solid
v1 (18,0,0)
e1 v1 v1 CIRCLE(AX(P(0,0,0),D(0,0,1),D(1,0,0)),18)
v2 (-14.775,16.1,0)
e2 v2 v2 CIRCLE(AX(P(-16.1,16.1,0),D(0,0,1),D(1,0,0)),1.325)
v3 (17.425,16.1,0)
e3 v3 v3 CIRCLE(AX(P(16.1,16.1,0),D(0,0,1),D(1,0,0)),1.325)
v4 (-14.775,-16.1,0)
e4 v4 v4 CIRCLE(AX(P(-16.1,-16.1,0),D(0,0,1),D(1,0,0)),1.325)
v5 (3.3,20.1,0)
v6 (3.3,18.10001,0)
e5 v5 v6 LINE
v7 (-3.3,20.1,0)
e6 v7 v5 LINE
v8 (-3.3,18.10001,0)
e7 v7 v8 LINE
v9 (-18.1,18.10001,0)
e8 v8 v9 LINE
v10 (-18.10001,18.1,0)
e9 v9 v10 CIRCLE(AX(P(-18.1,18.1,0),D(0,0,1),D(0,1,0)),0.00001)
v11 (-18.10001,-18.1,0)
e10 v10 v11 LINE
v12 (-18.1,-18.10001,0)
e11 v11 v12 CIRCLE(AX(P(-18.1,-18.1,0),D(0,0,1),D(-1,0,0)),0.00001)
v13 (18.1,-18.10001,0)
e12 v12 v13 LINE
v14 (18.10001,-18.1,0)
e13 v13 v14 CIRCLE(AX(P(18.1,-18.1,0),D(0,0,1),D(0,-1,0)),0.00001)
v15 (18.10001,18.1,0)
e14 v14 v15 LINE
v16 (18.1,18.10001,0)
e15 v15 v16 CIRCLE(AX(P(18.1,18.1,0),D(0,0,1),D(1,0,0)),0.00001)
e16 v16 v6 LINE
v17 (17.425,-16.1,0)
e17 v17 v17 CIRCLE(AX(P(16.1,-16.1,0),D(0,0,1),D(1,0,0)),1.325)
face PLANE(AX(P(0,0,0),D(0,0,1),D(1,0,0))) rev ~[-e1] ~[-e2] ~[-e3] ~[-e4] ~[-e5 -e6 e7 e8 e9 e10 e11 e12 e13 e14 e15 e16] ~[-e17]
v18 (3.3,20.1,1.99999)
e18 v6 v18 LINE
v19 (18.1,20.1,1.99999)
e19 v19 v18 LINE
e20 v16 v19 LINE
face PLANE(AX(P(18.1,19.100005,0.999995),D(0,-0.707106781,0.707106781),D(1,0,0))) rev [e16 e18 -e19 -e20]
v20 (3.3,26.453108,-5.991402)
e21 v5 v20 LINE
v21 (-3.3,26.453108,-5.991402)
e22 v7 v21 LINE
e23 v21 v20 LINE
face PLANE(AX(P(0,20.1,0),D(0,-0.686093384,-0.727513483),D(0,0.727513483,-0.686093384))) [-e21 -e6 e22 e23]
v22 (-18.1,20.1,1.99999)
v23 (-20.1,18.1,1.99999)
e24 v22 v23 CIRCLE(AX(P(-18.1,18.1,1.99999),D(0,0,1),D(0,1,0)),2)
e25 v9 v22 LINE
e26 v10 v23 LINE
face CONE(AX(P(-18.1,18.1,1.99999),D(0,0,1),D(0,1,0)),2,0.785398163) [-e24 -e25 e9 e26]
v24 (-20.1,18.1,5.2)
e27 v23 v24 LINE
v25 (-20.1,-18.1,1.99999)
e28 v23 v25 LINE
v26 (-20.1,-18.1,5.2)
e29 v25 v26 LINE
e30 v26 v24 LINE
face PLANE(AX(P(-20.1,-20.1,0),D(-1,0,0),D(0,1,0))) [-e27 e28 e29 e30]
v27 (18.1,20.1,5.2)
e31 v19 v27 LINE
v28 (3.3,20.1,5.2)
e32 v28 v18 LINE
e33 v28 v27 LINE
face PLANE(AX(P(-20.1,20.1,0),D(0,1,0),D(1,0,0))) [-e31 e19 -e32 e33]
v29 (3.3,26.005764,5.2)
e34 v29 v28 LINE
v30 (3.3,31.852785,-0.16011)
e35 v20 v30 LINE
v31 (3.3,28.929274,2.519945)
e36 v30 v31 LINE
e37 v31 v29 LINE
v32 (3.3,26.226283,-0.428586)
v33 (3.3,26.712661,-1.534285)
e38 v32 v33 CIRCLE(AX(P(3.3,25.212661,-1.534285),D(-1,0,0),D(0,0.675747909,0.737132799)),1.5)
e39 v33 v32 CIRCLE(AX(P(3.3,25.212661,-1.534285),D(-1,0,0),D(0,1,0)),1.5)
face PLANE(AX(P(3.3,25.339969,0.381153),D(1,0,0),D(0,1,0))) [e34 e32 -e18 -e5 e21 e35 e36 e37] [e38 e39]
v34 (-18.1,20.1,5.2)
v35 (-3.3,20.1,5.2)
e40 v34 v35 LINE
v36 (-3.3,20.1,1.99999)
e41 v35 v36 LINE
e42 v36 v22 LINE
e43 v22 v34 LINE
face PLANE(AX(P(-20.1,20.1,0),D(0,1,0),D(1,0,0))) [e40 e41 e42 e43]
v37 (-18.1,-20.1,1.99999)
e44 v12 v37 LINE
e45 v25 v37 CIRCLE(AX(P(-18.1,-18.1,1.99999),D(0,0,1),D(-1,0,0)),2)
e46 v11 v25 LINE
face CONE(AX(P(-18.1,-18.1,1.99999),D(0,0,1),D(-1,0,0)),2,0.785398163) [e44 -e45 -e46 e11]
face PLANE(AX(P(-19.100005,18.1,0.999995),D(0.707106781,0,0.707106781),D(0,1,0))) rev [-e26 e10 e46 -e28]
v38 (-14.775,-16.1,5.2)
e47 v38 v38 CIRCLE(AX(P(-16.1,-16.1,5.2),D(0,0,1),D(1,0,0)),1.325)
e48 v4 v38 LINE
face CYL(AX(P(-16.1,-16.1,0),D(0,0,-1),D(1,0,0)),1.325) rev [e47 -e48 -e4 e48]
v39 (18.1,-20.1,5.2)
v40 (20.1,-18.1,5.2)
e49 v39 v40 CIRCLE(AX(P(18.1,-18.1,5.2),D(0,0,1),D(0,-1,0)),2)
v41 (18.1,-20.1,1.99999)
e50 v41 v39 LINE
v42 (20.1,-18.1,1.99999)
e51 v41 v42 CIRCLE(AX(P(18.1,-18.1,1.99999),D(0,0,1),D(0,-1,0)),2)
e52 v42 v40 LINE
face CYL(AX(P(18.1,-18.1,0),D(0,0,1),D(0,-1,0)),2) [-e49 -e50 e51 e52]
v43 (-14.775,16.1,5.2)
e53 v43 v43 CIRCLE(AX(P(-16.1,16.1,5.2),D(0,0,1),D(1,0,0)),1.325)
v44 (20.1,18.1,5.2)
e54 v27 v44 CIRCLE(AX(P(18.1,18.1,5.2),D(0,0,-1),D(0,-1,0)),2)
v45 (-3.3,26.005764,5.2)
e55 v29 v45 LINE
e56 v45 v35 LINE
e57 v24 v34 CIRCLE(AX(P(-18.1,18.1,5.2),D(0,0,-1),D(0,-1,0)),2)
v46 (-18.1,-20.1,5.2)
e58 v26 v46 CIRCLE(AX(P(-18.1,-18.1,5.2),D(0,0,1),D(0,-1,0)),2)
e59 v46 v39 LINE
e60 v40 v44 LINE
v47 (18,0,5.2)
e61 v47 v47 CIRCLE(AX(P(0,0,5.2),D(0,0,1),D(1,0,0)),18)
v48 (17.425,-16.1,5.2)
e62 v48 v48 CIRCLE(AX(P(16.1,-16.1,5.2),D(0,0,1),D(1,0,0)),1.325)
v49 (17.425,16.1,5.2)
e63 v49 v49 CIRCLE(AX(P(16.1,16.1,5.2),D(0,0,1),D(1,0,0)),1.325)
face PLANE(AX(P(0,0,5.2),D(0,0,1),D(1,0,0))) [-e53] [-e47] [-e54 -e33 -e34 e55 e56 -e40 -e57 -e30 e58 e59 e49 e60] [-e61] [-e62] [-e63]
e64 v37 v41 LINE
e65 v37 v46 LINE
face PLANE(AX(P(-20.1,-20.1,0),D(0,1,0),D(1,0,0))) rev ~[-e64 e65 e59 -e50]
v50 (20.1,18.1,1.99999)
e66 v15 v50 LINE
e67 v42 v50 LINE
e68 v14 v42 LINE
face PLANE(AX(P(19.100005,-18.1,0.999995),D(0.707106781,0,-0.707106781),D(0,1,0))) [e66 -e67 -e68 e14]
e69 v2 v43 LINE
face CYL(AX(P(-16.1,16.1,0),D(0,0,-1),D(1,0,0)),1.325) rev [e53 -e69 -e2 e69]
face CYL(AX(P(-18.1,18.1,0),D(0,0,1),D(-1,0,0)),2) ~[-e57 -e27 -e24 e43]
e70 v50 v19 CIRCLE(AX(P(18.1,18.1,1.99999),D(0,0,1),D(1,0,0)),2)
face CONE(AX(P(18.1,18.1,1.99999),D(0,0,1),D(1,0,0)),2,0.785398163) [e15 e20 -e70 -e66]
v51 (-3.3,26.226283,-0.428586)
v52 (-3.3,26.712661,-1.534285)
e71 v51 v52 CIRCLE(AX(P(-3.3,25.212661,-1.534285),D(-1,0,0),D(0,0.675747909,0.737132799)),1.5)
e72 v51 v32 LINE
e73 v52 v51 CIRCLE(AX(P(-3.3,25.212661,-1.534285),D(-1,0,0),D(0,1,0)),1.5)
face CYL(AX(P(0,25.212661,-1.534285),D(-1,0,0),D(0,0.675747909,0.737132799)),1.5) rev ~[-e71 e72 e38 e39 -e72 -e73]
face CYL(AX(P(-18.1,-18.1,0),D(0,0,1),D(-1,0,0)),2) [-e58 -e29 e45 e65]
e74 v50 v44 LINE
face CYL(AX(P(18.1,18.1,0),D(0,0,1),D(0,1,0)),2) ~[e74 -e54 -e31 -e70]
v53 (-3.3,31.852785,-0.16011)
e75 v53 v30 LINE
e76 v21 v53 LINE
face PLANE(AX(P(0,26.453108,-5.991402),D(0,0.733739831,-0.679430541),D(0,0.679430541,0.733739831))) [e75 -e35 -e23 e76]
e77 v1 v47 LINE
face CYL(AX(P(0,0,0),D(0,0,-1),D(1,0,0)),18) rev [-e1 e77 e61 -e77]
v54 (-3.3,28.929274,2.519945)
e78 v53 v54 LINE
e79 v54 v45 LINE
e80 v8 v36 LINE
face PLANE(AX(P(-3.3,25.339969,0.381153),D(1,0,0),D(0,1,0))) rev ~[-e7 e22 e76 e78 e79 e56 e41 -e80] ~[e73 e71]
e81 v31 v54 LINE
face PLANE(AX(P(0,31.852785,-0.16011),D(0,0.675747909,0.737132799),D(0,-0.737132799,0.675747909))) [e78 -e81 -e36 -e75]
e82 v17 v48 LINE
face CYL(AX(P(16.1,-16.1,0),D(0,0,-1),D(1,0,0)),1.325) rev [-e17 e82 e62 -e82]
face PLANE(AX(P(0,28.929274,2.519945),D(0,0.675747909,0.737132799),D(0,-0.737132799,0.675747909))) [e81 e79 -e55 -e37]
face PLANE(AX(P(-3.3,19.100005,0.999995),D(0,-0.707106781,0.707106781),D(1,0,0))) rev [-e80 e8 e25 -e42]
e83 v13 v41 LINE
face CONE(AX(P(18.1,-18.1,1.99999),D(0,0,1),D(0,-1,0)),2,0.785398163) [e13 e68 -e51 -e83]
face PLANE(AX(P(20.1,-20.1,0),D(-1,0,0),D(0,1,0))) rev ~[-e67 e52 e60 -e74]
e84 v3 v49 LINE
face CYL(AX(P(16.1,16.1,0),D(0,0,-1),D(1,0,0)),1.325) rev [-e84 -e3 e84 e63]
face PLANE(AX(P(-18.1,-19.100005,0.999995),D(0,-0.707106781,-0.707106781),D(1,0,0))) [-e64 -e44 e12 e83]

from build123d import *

# Parameters (mm, degrees)
F0_W     = 40.2
F0_H     = 40.2
F0_R     = 1.325
F0_R_2   = 18
F1_DEPTH = 5.2
F2_R     = 2
F6_DEPTH = 3.3
F7_SIZE  = 1.99999


# Not quite as in the source:
# - a fillet or chamfer is up to 0.001 mm smaller than in the source, because OpenCascade refuses the exact size


with BuildPart() as f1:
    # F0 (on Top) → F1 (new body)
    with BuildSketch(Plane.XY):
        Rectangle(F0_W, F0_H)
        with Locations((-16.1, -16.1)):
            Circle(F0_R, mode=Mode.SUBTRACT)
        with Locations((16.1, -16.1)):
            Circle(F0_R, mode=Mode.SUBTRACT)
        with Locations((-16.1, 16.1)):
            Circle(F0_R, mode=Mode.SUBTRACT)
        Circle(F0_R_2, mode=Mode.SUBTRACT)
        with Locations((16.1, 16.1)):
            Circle(F0_R, mode=Mode.SUBTRACT)
    extrude(amount=F1_DEPTH)

    # F2
    f2_edges = [f1.edges().sort_by_distance(p)[0] for p in [
        (-20.1, 20.1, 2.6),
        (20.1, 20.1, 2.6),
        (20.1, -20.1, 2.6),
        (-20.1, -20.1, 2.6),
    ]]
    fillet(f2_edges, radius=F2_R)

    # F5 (on line) → F6 (join, symmetric)
    with BuildSketch(Plane.YZ):
        Polygon((20.1, 5.2), (20.1, 0), (26.4531082501, -5.9914017233), (31.8527851563, -0.1601095172), (28.929274422, 2.5199452414), (26.0057636878, 5.2), align=None)
        with BuildLine():
            ThreePointArc((26.7126609223, -1.5342851533), (23.8396290954, -2.1382583334), (26.2262827859, -0.4285859547))
            ThreePointArc((26.2262827859, -0.4285859547), (26.5856927492, -0.9303119732), (26.7126609223, -1.5342851533))
        make_face(mode=Mode.SUBTRACT)
    extrude(amount=F6_DEPTH, both=True)

    # F7 (size 2 in the source; OpenCascade refuses exactly that, so slightly less here)
    f7_edges = [f1.edges().sort_by_distance(p)[0] for p in [
        (0, -20.1, 0),
    ]]
    chamfer(f7_edges, length=F7_SIZE)


solid = f1.part
